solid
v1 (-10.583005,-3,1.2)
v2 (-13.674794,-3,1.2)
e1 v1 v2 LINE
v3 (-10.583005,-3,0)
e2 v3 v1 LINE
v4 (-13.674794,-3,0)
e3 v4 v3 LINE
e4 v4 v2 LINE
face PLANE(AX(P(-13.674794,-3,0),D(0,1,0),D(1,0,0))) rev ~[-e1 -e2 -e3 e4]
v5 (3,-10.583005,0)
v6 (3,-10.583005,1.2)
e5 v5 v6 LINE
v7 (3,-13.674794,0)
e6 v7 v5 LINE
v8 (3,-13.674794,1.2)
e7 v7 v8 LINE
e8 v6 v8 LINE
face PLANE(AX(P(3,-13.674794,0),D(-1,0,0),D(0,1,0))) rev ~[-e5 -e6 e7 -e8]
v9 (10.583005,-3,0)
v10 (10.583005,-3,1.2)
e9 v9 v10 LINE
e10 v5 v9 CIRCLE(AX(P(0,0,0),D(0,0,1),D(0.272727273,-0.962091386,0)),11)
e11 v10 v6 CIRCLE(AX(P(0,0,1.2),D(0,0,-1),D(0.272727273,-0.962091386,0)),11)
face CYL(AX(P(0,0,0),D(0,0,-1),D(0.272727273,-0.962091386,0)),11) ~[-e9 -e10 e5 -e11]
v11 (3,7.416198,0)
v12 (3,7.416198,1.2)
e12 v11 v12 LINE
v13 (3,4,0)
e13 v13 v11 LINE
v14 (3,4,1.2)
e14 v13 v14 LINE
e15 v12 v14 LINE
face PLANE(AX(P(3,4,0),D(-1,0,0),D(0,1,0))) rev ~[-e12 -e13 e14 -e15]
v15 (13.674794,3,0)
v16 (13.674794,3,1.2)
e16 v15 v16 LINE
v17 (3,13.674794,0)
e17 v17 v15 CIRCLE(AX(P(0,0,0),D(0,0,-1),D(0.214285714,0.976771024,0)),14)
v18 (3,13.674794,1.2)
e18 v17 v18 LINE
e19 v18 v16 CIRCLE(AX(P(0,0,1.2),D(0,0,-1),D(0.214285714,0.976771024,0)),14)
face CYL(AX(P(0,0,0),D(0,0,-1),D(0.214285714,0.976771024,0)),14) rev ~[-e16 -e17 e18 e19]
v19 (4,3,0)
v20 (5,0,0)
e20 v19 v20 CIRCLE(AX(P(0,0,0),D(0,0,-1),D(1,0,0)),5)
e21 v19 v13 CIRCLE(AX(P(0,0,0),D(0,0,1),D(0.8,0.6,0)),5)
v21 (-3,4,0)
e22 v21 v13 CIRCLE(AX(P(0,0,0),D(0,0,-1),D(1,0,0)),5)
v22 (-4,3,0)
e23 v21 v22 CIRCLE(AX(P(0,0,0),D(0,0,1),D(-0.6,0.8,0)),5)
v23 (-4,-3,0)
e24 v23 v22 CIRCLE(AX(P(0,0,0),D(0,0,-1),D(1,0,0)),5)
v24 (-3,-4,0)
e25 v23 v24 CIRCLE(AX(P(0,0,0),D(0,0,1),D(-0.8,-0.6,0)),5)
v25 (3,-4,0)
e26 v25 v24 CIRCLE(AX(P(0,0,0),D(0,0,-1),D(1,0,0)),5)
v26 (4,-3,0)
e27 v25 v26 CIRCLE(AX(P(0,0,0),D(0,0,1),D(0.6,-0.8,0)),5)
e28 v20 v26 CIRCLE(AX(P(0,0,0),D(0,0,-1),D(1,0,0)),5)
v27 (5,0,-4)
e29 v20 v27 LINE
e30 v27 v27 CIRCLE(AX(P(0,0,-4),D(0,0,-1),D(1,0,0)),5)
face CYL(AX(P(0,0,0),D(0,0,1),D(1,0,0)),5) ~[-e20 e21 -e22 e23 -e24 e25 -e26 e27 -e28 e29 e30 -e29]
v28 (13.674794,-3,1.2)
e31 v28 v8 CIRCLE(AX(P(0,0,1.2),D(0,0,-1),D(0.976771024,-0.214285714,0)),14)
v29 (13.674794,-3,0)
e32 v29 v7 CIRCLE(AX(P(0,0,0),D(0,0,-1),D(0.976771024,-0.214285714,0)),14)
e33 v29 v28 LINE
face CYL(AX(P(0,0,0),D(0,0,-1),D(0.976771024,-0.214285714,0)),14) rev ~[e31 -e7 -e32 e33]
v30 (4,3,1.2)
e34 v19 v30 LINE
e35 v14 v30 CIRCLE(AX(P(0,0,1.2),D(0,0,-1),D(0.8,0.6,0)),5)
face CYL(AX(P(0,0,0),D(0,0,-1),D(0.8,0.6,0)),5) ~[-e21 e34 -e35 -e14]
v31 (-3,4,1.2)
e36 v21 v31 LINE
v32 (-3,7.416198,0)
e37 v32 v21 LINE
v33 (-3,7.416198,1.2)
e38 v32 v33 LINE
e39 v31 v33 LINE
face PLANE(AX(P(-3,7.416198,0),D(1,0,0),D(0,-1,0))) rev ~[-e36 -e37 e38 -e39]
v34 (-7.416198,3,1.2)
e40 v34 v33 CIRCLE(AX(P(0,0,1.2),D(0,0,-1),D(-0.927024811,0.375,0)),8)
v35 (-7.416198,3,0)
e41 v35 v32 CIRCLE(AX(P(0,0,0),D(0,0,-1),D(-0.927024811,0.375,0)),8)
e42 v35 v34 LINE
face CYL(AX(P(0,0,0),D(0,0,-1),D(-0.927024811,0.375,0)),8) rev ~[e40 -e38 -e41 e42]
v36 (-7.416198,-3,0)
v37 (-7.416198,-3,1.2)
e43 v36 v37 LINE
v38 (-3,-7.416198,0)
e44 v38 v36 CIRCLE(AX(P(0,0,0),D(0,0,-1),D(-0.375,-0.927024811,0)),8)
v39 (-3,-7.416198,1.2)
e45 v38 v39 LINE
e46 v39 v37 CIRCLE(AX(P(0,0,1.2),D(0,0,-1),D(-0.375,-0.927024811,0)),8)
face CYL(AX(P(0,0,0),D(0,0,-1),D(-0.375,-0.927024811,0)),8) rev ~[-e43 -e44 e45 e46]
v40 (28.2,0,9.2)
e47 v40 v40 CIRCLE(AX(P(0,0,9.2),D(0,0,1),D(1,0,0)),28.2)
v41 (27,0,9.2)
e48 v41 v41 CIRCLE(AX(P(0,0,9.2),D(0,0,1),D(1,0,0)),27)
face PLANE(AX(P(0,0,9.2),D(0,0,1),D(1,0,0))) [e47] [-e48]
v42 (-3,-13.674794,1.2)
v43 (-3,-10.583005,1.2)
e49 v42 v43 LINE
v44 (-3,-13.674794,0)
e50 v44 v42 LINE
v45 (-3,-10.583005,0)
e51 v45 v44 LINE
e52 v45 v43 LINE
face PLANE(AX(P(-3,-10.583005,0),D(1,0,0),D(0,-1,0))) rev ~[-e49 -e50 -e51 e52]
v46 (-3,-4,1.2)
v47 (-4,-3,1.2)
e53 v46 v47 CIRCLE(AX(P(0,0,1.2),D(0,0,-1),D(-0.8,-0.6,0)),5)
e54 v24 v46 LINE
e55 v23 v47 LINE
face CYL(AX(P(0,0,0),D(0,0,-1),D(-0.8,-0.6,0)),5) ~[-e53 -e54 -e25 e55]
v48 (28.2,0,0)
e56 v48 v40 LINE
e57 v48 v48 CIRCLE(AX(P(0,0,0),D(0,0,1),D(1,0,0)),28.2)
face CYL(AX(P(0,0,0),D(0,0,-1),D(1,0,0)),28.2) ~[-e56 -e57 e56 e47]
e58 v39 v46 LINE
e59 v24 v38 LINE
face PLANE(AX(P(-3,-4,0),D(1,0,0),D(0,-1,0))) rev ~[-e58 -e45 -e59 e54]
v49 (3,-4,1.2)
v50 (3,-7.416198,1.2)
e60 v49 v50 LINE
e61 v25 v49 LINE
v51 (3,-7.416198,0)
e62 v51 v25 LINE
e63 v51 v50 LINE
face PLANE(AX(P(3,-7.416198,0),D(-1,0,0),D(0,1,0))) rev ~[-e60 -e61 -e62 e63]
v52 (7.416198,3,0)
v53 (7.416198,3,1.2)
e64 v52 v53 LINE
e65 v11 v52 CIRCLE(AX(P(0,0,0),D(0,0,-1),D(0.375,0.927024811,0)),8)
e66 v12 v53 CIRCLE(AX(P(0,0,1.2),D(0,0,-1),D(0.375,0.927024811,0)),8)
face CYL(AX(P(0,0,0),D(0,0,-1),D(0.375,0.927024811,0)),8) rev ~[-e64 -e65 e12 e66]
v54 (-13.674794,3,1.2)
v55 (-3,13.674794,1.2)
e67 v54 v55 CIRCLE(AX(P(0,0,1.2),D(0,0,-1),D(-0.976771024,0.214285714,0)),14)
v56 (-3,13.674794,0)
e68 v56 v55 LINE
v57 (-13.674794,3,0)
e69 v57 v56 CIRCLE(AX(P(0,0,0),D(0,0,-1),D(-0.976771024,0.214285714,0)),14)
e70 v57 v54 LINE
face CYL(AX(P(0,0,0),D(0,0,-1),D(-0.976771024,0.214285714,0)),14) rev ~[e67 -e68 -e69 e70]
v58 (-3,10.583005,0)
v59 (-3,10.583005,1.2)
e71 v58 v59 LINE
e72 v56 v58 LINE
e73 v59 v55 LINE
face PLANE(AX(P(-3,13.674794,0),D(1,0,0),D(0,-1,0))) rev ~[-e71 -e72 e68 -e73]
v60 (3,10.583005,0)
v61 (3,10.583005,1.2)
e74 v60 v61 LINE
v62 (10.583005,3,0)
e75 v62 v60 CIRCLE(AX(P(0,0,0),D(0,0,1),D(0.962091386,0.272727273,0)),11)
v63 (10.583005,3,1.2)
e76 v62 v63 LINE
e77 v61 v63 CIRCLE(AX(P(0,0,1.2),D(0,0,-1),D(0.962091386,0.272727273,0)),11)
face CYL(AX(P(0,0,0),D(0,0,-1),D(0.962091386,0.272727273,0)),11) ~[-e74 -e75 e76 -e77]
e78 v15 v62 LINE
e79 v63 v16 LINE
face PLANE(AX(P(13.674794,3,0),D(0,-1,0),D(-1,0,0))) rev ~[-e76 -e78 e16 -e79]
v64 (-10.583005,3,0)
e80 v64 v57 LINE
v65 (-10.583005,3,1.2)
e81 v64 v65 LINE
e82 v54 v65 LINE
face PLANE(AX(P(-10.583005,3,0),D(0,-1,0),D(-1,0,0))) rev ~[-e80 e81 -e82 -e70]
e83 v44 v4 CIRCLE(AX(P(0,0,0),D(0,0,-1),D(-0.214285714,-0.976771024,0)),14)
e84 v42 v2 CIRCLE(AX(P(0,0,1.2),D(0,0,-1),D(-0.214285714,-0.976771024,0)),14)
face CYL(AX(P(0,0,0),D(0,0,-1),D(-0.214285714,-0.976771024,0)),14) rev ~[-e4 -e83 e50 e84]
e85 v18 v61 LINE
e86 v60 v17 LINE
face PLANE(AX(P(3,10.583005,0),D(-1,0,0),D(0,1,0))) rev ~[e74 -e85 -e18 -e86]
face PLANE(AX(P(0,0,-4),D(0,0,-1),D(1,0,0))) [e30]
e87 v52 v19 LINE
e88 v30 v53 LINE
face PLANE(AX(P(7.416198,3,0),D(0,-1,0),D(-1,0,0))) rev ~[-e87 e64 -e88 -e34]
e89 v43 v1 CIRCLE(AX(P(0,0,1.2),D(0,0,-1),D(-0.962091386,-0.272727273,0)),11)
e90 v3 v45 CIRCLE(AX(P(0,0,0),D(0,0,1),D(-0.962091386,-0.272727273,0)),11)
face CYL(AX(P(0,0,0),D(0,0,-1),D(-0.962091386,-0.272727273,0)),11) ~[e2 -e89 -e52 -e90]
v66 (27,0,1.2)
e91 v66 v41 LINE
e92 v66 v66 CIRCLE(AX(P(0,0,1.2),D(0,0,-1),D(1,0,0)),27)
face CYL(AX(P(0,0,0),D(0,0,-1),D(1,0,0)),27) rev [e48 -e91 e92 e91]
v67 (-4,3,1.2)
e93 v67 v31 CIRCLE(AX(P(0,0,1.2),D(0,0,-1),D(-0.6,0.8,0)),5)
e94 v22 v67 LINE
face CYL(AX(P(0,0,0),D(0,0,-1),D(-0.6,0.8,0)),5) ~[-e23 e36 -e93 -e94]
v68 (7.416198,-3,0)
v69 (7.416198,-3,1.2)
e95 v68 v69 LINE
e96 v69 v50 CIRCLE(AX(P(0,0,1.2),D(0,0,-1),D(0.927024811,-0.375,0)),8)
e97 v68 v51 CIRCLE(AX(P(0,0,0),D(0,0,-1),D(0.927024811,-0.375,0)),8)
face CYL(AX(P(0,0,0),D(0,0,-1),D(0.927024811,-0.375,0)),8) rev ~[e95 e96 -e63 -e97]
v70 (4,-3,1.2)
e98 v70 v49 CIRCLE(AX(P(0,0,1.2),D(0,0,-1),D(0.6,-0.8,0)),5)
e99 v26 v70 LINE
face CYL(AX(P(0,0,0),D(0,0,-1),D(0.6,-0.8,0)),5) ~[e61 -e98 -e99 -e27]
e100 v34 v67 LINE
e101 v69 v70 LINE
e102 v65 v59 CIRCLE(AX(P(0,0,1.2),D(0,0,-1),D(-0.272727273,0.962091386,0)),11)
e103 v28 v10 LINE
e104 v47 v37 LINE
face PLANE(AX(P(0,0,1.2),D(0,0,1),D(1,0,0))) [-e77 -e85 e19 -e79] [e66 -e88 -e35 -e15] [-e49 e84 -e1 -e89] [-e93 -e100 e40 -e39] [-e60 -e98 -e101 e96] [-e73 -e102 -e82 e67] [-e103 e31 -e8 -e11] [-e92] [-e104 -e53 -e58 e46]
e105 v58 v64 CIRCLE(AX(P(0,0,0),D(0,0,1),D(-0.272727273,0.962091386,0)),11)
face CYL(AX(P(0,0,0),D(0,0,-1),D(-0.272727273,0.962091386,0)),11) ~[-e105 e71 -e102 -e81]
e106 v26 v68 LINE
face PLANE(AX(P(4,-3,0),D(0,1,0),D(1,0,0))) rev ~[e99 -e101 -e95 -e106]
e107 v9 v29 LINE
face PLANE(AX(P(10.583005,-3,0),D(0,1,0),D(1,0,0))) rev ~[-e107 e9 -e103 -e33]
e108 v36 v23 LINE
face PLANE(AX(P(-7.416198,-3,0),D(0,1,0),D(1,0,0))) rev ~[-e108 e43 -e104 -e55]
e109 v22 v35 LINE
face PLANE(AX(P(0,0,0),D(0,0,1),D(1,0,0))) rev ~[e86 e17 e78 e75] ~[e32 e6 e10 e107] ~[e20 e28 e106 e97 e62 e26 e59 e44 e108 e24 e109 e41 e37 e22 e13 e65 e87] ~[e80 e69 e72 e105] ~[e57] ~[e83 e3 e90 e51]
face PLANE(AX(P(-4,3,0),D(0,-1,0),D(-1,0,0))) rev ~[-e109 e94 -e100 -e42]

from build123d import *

# Parameters (mm, degrees)
F0_R     = 28.2
F1_DEPTH = 9.2
F2_T     = -1.2
F4_DEPTH = 9.201
F5_R     = 5
F6_DEPTH = 4


# Not quite as in the source:
# - after a boolean that leaves OpenCascade's solid faulty, fix() repairs it


with BuildPart() as f1:
    # F0 (on Top) → F1 (new body)
    with BuildSketch(Plane.XY):
        Circle(F0_R)
    extrude(amount=F1_DEPTH)

    # F2
    f2_openings = [f1.faces().sort_by_distance(p)[0] for p in [
        (0, 0, 9.2),
    ]]
    offset(amount=F2_T, openings=f2_openings)

    # F3 (on face) → F4 (cut, through all)
    with BuildSketch(Plane(origin=(0, 0, 0), x_dir=(1, 0, 0), z_dir=(0, 0, -1))):
        with BuildLine():
            ThreePointArc((4, -3), (3.5355339059, -3.5355339059), (3, -4))
            Line((3, -4), (3, -7.4161984871))
            ThreePointArc((3, -7.4161984871), (5.6568542495, -5.6568542495), (7.4161984871, -3))
            Line((7.4161984871, -3), (4, -3))
        make_face()
        with BuildLine():
            ThreePointArc((10.5830052443, -3), (7.7781745931, -7.7781745931), (3, -10.5830052443))
            Line((3, -10.5830052443), (3, -13.6747943312))
            ThreePointArc((3, -13.6747943312), (9.8994949366, -9.8994949366), (13.6747943312, -3))
            Line((13.6747943312, -3), (10.5830052443, -3))
        make_face()
        with BuildLine():
            ThreePointArc((-13.6747943312, -3), (-9.8994949366, -9.8994949366), (-3, -13.6747943312))
            Line((-3, -13.6747943312), (-3, -10.5830052443))
            ThreePointArc((-3, -10.5830052443), (-7.7781745931, -7.7781745931), (-10.5830052443, -3))
            Line((-10.5830052443, -3), (-13.6747943312, -3))
        make_face()
        with BuildLine():
            ThreePointArc((-4, 3), (-3.5355339059, 3.5355339059), (-3, 4))
            Line((-3, 4), (-3, 7.4161984871))
            ThreePointArc((-3, 7.4161984871), (-5.6568542495, 5.6568542495), (-7.4161984871, 3))
            Line((-7.4161984871, 3), (-4, 3))
        make_face()
        with BuildLine():
            ThreePointArc((-10.5830052443, 3), (-7.7781745931, 7.7781745931), (-3, 10.5830052443))
            Line((-3, 10.5830052443), (-3, 13.6747943312))
            ThreePointArc((-3, 13.6747943312), (-9.8994949366, 9.8994949366), (-13.6747943312, 3))
            Line((-13.6747943312, 3), (-10.5830052443, 3))
        make_face()
        with BuildLine():
            Line((10.5830052443, 3), (13.6747943312, 3))
            ThreePointArc((13.6747943312, 3), (9.8994949366, 9.8994949366), (3, 13.6747943312))
            Line((3, 13.6747943312), (3, 10.5830052443))
            ThreePointArc((3, 10.5830052443), (7.7781745931, 7.7781745931), (10.5830052443, 3))
        make_face()
        with BuildLine():
            Line((4, 3), (7.4161984871, 3))
            ThreePointArc((7.4161984871, 3), (5.6568542495, 5.6568542495), (3, 7.4161984871))
            Line((3, 7.4161984871), (3, 4))
            ThreePointArc((3, 4), (3.5355339059, 3.5355339059), (4, 3))
        make_face()
        with BuildLine():
            Line((-4, -3), (-7.4161984871, -3))
            ThreePointArc((-7.4161984871, -3), (-5.6568542495, -5.6568542495), (-3, -7.4161984871))
            Line((-3, -7.4161984871), (-3, -4))
            ThreePointArc((-3, -4), (-3.5355339059, -3.5355339059), (-4, -3))
        make_face()
    extrude(amount=-F4_DEPTH, mode=Mode.SUBTRACT)

    # F5 (on face) → F6 (join)
    with BuildSketch(Plane(origin=(0, 0, 0), x_dir=(1, 0, 0), z_dir=(0, 0, -1))):
        Circle(F5_R)
    extrude(amount=F6_DEPTH)

    add(f1.part.fix(), mode=Mode.REPLACE)


solid = f1.part
